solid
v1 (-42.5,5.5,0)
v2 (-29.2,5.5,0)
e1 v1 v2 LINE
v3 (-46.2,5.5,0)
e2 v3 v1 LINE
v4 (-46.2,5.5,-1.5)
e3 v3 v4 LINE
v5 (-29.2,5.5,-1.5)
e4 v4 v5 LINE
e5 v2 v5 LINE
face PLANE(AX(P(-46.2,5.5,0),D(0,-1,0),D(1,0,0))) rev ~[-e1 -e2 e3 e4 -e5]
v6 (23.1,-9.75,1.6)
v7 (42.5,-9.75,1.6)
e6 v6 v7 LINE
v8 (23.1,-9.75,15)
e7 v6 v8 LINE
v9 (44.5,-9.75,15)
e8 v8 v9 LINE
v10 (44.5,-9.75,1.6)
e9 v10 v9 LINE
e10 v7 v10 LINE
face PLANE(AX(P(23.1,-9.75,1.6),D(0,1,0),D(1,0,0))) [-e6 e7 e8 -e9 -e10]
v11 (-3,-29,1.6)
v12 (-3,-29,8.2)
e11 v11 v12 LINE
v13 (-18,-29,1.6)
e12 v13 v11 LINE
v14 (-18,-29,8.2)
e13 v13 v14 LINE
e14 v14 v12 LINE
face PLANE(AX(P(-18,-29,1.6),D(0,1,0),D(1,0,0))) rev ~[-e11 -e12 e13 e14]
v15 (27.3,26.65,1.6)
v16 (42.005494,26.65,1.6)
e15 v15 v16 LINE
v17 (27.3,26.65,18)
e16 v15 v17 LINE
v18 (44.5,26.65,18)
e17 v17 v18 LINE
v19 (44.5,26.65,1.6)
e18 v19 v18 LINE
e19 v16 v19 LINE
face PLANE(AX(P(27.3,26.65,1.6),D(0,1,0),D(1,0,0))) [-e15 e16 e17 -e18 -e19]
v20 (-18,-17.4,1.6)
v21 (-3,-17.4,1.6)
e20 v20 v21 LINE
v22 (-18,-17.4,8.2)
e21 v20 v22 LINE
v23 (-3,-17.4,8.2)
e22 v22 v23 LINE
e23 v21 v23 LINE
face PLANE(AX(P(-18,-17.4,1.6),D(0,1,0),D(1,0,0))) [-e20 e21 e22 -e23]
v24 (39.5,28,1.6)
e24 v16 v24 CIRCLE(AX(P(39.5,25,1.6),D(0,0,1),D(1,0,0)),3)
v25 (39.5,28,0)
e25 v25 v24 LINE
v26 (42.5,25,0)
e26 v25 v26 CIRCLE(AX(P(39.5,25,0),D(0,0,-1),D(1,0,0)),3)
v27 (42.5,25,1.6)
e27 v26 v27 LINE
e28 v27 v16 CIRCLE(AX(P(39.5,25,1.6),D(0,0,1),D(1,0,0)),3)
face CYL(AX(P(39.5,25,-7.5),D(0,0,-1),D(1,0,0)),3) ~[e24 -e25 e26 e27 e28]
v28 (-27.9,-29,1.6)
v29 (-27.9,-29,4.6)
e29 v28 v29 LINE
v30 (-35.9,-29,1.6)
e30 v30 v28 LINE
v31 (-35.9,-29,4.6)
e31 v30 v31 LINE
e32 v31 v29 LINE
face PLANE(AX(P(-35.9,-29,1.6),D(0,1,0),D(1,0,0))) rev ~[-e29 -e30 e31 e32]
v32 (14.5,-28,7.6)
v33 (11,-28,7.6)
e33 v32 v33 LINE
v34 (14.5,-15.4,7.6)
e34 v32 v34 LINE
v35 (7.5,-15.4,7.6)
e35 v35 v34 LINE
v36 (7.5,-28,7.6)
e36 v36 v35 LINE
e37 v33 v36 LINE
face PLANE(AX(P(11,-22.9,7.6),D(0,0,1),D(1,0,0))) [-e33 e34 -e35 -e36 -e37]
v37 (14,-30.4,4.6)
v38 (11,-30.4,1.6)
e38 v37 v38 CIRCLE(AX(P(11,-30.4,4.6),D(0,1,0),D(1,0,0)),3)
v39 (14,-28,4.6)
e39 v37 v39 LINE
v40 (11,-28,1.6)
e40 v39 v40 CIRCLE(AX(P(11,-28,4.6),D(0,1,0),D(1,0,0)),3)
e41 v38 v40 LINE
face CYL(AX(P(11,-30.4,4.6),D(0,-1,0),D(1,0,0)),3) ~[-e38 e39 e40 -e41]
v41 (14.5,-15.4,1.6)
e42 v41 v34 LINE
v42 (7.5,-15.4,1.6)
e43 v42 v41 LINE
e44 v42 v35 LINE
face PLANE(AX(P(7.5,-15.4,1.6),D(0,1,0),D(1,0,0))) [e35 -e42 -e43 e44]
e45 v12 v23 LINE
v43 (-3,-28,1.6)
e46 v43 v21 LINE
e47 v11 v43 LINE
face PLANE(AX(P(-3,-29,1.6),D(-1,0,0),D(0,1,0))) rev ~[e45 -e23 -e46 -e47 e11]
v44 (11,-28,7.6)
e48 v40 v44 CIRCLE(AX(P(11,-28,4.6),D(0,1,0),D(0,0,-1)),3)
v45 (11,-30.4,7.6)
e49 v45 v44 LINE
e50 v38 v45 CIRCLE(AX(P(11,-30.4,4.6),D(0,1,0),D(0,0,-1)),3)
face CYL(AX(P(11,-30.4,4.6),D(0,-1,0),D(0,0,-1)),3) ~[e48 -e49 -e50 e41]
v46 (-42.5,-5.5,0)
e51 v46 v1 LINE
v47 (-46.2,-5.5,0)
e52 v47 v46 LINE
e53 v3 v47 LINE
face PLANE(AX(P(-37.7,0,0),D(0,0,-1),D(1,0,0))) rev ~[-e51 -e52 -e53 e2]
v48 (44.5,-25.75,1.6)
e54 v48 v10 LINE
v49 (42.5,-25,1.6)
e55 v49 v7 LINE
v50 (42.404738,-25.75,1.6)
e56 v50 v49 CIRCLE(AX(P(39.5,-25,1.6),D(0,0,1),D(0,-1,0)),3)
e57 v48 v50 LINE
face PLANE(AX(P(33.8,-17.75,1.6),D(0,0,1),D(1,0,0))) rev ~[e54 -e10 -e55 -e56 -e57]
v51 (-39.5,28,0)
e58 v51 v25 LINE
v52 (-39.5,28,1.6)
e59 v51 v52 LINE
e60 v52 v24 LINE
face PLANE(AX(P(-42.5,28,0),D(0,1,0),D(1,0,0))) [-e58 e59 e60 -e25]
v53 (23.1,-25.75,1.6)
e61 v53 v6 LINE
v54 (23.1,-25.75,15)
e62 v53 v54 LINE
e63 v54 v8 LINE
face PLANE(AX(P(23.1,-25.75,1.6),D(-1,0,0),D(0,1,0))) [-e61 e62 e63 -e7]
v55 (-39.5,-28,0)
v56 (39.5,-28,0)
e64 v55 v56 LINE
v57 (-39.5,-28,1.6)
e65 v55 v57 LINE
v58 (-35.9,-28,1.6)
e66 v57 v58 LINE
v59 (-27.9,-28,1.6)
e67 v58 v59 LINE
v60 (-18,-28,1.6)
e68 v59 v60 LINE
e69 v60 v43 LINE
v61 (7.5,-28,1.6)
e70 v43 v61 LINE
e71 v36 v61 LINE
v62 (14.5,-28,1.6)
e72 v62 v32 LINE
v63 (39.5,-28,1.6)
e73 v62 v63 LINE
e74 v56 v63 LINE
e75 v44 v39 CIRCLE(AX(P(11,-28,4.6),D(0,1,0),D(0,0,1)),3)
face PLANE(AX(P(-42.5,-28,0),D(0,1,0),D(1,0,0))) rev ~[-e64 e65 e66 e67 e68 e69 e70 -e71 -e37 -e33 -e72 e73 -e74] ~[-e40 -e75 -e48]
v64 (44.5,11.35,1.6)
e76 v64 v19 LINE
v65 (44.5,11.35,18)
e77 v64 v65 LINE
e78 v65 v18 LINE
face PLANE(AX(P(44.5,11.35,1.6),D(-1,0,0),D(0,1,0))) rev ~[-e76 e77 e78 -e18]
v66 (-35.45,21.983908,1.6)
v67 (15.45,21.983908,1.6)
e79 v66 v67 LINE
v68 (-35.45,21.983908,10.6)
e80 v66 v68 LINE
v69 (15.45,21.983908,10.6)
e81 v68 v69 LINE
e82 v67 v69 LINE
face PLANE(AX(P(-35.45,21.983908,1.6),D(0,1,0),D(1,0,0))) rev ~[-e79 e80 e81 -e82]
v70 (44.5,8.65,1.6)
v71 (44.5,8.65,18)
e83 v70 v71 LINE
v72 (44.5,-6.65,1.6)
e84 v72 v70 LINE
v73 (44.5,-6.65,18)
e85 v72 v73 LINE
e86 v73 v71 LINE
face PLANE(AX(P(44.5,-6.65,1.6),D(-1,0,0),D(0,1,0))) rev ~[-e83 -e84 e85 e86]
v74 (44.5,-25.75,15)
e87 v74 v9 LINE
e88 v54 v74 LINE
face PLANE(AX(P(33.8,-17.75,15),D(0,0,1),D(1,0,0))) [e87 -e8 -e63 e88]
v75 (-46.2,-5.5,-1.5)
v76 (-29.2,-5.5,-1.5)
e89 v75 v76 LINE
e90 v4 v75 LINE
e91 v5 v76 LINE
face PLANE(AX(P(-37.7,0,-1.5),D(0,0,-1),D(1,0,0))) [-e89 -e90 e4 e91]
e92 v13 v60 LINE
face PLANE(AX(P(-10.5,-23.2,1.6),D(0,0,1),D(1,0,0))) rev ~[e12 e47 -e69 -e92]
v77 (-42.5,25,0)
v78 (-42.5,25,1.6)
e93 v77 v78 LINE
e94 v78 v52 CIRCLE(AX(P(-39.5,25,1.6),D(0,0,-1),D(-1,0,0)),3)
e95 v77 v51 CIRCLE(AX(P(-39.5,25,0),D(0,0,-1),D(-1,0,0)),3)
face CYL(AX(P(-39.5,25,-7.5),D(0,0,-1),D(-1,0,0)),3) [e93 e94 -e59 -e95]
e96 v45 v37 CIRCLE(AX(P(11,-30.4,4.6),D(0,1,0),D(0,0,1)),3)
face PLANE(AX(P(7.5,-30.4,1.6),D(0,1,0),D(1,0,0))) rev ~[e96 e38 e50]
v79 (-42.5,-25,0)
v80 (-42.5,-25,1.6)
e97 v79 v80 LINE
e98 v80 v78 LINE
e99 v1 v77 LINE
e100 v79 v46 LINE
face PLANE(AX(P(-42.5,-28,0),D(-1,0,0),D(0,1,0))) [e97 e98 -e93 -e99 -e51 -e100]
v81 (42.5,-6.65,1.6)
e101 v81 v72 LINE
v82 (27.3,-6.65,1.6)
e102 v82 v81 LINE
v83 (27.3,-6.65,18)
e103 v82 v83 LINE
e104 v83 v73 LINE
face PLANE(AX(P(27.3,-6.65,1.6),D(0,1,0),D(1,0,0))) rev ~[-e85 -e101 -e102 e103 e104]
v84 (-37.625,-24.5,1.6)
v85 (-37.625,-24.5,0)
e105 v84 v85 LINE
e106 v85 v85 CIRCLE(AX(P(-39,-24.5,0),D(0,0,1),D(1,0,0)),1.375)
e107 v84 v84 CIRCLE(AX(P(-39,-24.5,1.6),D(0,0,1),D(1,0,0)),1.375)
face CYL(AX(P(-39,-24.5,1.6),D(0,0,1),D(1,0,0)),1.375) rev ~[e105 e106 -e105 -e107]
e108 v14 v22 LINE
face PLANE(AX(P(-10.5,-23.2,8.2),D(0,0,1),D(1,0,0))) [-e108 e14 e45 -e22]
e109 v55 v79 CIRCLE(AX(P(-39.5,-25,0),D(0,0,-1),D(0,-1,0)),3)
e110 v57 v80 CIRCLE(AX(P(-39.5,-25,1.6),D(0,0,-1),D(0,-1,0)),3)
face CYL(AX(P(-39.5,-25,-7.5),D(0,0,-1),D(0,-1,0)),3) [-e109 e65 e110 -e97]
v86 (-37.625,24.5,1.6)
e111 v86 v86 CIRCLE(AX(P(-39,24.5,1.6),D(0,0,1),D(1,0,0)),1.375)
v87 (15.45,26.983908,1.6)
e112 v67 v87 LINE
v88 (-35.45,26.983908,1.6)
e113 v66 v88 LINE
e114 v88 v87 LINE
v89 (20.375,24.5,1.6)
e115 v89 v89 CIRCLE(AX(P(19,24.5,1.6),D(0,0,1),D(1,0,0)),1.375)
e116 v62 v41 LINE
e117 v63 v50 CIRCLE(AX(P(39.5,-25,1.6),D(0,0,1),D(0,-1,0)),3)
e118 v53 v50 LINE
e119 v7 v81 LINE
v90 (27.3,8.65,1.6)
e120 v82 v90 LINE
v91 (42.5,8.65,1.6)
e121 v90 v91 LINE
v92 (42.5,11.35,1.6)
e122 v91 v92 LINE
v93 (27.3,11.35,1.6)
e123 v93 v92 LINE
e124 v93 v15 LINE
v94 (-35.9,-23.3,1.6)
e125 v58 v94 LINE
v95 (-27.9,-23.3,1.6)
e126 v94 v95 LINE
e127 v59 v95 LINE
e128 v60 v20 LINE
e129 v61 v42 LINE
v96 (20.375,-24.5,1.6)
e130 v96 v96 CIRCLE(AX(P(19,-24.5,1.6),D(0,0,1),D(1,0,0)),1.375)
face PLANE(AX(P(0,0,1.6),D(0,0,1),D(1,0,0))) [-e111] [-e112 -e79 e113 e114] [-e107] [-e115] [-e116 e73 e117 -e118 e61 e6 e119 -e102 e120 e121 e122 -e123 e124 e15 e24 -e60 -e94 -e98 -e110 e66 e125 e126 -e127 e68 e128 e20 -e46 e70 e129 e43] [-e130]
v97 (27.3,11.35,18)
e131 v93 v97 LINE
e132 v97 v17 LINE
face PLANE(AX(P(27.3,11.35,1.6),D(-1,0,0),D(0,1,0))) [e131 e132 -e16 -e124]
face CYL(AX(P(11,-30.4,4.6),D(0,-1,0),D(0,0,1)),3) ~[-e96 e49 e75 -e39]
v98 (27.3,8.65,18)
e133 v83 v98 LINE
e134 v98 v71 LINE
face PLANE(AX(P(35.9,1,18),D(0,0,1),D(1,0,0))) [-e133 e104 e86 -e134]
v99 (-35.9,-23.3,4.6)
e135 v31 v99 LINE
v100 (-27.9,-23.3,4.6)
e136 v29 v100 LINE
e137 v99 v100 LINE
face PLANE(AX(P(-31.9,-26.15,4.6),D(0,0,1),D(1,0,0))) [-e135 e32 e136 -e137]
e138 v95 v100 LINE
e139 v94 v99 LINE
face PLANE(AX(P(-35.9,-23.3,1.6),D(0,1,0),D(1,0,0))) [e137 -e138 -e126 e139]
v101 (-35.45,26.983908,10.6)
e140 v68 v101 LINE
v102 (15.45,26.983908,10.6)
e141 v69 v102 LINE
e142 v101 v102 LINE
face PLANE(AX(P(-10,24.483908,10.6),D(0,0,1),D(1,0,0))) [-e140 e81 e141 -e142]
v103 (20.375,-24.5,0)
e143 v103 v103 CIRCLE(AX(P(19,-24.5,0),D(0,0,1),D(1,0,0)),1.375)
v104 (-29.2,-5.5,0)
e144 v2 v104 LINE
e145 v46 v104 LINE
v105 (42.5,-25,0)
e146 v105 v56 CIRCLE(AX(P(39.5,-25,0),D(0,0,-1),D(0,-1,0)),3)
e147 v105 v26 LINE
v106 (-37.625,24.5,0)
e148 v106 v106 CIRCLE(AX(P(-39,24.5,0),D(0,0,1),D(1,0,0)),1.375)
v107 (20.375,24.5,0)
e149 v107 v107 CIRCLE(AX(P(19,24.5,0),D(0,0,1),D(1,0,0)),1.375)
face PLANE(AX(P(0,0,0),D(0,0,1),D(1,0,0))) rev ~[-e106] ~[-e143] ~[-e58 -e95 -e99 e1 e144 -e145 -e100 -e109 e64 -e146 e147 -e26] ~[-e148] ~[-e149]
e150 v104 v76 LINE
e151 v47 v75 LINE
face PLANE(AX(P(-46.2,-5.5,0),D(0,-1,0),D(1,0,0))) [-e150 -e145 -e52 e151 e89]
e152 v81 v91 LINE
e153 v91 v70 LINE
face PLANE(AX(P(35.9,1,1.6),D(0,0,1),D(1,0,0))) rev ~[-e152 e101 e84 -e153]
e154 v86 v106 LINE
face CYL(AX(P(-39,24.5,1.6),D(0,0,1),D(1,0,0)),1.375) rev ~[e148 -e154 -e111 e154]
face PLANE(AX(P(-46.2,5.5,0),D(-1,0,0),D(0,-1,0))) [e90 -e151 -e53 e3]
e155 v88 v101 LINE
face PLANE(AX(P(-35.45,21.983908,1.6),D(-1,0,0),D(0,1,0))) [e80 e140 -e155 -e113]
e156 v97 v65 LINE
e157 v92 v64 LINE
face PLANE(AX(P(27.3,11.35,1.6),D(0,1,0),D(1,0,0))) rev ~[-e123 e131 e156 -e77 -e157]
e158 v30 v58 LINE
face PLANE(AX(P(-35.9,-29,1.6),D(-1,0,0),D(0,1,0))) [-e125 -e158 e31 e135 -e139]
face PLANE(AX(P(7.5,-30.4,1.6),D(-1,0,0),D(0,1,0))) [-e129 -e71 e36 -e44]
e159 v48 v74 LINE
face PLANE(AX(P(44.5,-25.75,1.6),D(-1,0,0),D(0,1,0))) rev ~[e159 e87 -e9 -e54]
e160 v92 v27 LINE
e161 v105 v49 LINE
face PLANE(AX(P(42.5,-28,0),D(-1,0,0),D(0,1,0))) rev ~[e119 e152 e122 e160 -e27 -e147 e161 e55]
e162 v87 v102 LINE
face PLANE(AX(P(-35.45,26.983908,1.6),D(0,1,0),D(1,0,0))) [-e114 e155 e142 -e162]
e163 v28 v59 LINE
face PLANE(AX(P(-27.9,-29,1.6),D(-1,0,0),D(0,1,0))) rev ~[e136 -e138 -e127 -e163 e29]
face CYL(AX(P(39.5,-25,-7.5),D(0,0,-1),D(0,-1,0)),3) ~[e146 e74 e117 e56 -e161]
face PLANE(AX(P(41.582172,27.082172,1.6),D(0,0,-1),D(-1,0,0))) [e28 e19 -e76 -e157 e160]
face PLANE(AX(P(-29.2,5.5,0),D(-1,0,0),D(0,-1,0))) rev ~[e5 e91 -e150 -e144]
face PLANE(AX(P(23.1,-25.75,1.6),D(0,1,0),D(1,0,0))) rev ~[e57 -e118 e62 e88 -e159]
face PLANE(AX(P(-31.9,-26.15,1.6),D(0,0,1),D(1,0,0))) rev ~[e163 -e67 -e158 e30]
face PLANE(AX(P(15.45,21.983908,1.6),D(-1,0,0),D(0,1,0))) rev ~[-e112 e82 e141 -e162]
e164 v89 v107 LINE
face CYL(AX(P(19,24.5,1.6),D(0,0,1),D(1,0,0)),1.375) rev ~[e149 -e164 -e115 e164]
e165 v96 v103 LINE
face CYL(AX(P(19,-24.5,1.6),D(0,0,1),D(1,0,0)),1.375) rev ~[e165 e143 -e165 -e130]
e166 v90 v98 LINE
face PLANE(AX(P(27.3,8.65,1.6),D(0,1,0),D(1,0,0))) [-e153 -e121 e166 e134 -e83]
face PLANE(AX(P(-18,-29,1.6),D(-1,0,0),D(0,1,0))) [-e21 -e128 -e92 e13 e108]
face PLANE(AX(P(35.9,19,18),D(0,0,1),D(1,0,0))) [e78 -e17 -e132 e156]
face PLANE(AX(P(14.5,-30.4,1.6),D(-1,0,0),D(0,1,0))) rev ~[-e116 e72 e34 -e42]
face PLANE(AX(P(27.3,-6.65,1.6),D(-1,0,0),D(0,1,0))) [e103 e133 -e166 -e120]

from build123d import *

# Parameters (mm, degrees)
F0_W         = 85
F0_H         = 56
F1_DEPTH     = 1.6
F2_W         = 21.4
F2_H         = 16
F3_DEPTH     = 13.4
F4_W         = 17.2
F4_H         = 15.3
F5_DEPTH     = 16.4
F6_W         = 15
F6_H         = 11.6
F7_DEPTH     = 6.6
F8_W         = 7
F8_H         = 15
F9_DEPTH     = 6
F10_W        = 8
F10_H        = 5.7
F11_DEPTH    = 3
F12_W        = 17
F12_H        = 11
F13_DEPTH    = 1.5
F14_R        = 1.375
F15_DEPTH    = 3.101
F16_T1_DEPTH = 16.6
F16_T3_DEPTH = 9.1
F17_W        = 50.9
F17_H        = 5
F18_DEPTH    = 9
F20_DEPTH    = 2.4


# Not quite as in the source:
# - a fillet or chamfer that OpenCascade refuses, or shapes differently, is made with other operations: its cross-section is extruded or revolved along the edge and cut away or added


with BuildPart() as f1:
    # F0 (on Top) → F1 (new body)
    with BuildSketch(Plane.XY):
        Rectangle(F0_W, F0_H)
    extrude(amount=F1_DEPTH)

    # F2 (on face) → F3 (join)
    with BuildSketch(Plane.XY.offset(1.6)):
        with Locations((33.8, -17.75)):
            Rectangle(F2_W, F2_H)
    extrude(amount=F3_DEPTH)

    # F4 (on face) → F5 (join)
    with BuildSketch(Plane.XY.offset(1.6)):
        with Locations((35.9, 1)):
            Rectangle(F4_W, F4_H)
        with Locations((35.9, 19)):
            Rectangle(F4_W, F4_H)
    extrude(amount=F5_DEPTH)

    # F6 (on face) → F7 (join)
    with BuildSketch(Plane.XY.offset(1.6)):
        with Locations((-10.5, -23.2)):
            Rectangle(F6_W, F6_H)
    extrude(amount=F7_DEPTH)

    # F8 (on face) → F9 (join)
    with BuildSketch(Plane.XY.offset(1.6)):
        with Locations((11, -22.9)):
            Rectangle(F8_W, F8_H)
    extrude(amount=F9_DEPTH)

    # F10 (on face) → F11 (join)
    with BuildSketch(Plane.XY.offset(1.6)):
        with Locations((-31.9, -26.15)):
            Rectangle(F10_W, F10_H)
    extrude(amount=F11_DEPTH)

    # F12 (on face) → F13 (join)
    with BuildSketch(Plane(origin=(0, 0, 0), x_dir=(1, 0, 0), z_dir=(0, 0, -1))):
        with Locations((-37.7, 0)):
            Rectangle(F12_W, F12_H)
    extrude(amount=F13_DEPTH)

    # F14 (on face) → F15 (cut, through all)
    with BuildSketch(Plane.XY.offset(1.6)):
        with Locations((-39, -24.5)):
            Circle(F14_R)
        with Locations((19, -24.5)):
            Circle(F14_R)
        with Locations((-39, 24.5)):
            Circle(F14_R)
        with Locations((19, 24.5)):
            Circle(F14_R)
    extrude(amount=-F15_DEPTH, mode=Mode.SUBTRACT)

    # F16: fillet of radius 3 on 4 edges, made by hand

    # F16_s2 → F16_t1 (cut)
    with BuildSketch(Plane.XY.offset(-7.5)):
        with BuildLine():
            ThreePointArc((-39.5, -28), (-41.6213203436, -27.1213203436), (-42.5, -25))
            Line((-42.5, -25), (-42.5, -28))
            Line((-42.5, -28), (-39.5, -28))
        make_face()
        with BuildLine():
            ThreePointArc((-42.5, 25), (-41.6213203436, 27.1213203436), (-39.5, 28))
            Line((-39.5, 28), (-42.5, 28))
            Line((-42.5, 28), (-42.5, 25))
        make_face()
    extrude(amount=F16_T1_DEPTH, mode=Mode.SUBTRACT)

    # F16_s4 → F16_t3 (cut)
    with BuildSketch(Plane.XY.offset(-7.5)):
        with BuildLine():
            ThreePointArc((39.5, -28), (41.6213203436, -27.1213203436), (42.5, -25))
            Line((42.5, -25), (42.5, -28))
            Line((42.5, -28), (39.5, -28))
        make_face()
        with BuildLine():
            ThreePointArc((42.5, 25), (41.6213203436, 27.1213203436), (39.5, 28))
            Line((39.5, 28), (42.5, 28))
            Line((42.5, 28), (42.5, 25))
        make_face()
    extrude(amount=F16_T3_DEPTH, mode=Mode.SUBTRACT)

    # F17 (on face) → F18 (join)
    with BuildSketch(Plane.XY.offset(1.6)):
        with Locations((-10, 24.4839084893)):
            Rectangle(F17_W, F17_H)
    extrude(amount=F18_DEPTH)

    # F19 (on face) → F20 (cut)
    with BuildSketch(Plane.XZ.offset(30.4)):
        with BuildLine():
            ThreePointArc((11, 7.6), (13.1213203436, 6.7213203436), (14, 4.6))
            ThreePointArc((14, 4.6), (13.1213203436, 2.4786796564), (11, 1.6))
            Line((11, 1.6), (14.5, 1.6))
            Line((14.5, 1.6), (14.5, 7.6))
            Line((14.5, 7.6), (11, 7.6))
        make_face()
        with BuildLine():
            ThreePointArc((11, 1.6), (8, 4.6), (11, 7.6))
            Line((11, 7.6), (7.5, 7.6))
            Line((7.5, 7.6), (7.5, 1.6))
            Line((7.5, 1.6), (11, 1.6))
        make_face()
    extrude(amount=-F20_DEPTH, mode=Mode.SUBTRACT)


solid = f1.part
